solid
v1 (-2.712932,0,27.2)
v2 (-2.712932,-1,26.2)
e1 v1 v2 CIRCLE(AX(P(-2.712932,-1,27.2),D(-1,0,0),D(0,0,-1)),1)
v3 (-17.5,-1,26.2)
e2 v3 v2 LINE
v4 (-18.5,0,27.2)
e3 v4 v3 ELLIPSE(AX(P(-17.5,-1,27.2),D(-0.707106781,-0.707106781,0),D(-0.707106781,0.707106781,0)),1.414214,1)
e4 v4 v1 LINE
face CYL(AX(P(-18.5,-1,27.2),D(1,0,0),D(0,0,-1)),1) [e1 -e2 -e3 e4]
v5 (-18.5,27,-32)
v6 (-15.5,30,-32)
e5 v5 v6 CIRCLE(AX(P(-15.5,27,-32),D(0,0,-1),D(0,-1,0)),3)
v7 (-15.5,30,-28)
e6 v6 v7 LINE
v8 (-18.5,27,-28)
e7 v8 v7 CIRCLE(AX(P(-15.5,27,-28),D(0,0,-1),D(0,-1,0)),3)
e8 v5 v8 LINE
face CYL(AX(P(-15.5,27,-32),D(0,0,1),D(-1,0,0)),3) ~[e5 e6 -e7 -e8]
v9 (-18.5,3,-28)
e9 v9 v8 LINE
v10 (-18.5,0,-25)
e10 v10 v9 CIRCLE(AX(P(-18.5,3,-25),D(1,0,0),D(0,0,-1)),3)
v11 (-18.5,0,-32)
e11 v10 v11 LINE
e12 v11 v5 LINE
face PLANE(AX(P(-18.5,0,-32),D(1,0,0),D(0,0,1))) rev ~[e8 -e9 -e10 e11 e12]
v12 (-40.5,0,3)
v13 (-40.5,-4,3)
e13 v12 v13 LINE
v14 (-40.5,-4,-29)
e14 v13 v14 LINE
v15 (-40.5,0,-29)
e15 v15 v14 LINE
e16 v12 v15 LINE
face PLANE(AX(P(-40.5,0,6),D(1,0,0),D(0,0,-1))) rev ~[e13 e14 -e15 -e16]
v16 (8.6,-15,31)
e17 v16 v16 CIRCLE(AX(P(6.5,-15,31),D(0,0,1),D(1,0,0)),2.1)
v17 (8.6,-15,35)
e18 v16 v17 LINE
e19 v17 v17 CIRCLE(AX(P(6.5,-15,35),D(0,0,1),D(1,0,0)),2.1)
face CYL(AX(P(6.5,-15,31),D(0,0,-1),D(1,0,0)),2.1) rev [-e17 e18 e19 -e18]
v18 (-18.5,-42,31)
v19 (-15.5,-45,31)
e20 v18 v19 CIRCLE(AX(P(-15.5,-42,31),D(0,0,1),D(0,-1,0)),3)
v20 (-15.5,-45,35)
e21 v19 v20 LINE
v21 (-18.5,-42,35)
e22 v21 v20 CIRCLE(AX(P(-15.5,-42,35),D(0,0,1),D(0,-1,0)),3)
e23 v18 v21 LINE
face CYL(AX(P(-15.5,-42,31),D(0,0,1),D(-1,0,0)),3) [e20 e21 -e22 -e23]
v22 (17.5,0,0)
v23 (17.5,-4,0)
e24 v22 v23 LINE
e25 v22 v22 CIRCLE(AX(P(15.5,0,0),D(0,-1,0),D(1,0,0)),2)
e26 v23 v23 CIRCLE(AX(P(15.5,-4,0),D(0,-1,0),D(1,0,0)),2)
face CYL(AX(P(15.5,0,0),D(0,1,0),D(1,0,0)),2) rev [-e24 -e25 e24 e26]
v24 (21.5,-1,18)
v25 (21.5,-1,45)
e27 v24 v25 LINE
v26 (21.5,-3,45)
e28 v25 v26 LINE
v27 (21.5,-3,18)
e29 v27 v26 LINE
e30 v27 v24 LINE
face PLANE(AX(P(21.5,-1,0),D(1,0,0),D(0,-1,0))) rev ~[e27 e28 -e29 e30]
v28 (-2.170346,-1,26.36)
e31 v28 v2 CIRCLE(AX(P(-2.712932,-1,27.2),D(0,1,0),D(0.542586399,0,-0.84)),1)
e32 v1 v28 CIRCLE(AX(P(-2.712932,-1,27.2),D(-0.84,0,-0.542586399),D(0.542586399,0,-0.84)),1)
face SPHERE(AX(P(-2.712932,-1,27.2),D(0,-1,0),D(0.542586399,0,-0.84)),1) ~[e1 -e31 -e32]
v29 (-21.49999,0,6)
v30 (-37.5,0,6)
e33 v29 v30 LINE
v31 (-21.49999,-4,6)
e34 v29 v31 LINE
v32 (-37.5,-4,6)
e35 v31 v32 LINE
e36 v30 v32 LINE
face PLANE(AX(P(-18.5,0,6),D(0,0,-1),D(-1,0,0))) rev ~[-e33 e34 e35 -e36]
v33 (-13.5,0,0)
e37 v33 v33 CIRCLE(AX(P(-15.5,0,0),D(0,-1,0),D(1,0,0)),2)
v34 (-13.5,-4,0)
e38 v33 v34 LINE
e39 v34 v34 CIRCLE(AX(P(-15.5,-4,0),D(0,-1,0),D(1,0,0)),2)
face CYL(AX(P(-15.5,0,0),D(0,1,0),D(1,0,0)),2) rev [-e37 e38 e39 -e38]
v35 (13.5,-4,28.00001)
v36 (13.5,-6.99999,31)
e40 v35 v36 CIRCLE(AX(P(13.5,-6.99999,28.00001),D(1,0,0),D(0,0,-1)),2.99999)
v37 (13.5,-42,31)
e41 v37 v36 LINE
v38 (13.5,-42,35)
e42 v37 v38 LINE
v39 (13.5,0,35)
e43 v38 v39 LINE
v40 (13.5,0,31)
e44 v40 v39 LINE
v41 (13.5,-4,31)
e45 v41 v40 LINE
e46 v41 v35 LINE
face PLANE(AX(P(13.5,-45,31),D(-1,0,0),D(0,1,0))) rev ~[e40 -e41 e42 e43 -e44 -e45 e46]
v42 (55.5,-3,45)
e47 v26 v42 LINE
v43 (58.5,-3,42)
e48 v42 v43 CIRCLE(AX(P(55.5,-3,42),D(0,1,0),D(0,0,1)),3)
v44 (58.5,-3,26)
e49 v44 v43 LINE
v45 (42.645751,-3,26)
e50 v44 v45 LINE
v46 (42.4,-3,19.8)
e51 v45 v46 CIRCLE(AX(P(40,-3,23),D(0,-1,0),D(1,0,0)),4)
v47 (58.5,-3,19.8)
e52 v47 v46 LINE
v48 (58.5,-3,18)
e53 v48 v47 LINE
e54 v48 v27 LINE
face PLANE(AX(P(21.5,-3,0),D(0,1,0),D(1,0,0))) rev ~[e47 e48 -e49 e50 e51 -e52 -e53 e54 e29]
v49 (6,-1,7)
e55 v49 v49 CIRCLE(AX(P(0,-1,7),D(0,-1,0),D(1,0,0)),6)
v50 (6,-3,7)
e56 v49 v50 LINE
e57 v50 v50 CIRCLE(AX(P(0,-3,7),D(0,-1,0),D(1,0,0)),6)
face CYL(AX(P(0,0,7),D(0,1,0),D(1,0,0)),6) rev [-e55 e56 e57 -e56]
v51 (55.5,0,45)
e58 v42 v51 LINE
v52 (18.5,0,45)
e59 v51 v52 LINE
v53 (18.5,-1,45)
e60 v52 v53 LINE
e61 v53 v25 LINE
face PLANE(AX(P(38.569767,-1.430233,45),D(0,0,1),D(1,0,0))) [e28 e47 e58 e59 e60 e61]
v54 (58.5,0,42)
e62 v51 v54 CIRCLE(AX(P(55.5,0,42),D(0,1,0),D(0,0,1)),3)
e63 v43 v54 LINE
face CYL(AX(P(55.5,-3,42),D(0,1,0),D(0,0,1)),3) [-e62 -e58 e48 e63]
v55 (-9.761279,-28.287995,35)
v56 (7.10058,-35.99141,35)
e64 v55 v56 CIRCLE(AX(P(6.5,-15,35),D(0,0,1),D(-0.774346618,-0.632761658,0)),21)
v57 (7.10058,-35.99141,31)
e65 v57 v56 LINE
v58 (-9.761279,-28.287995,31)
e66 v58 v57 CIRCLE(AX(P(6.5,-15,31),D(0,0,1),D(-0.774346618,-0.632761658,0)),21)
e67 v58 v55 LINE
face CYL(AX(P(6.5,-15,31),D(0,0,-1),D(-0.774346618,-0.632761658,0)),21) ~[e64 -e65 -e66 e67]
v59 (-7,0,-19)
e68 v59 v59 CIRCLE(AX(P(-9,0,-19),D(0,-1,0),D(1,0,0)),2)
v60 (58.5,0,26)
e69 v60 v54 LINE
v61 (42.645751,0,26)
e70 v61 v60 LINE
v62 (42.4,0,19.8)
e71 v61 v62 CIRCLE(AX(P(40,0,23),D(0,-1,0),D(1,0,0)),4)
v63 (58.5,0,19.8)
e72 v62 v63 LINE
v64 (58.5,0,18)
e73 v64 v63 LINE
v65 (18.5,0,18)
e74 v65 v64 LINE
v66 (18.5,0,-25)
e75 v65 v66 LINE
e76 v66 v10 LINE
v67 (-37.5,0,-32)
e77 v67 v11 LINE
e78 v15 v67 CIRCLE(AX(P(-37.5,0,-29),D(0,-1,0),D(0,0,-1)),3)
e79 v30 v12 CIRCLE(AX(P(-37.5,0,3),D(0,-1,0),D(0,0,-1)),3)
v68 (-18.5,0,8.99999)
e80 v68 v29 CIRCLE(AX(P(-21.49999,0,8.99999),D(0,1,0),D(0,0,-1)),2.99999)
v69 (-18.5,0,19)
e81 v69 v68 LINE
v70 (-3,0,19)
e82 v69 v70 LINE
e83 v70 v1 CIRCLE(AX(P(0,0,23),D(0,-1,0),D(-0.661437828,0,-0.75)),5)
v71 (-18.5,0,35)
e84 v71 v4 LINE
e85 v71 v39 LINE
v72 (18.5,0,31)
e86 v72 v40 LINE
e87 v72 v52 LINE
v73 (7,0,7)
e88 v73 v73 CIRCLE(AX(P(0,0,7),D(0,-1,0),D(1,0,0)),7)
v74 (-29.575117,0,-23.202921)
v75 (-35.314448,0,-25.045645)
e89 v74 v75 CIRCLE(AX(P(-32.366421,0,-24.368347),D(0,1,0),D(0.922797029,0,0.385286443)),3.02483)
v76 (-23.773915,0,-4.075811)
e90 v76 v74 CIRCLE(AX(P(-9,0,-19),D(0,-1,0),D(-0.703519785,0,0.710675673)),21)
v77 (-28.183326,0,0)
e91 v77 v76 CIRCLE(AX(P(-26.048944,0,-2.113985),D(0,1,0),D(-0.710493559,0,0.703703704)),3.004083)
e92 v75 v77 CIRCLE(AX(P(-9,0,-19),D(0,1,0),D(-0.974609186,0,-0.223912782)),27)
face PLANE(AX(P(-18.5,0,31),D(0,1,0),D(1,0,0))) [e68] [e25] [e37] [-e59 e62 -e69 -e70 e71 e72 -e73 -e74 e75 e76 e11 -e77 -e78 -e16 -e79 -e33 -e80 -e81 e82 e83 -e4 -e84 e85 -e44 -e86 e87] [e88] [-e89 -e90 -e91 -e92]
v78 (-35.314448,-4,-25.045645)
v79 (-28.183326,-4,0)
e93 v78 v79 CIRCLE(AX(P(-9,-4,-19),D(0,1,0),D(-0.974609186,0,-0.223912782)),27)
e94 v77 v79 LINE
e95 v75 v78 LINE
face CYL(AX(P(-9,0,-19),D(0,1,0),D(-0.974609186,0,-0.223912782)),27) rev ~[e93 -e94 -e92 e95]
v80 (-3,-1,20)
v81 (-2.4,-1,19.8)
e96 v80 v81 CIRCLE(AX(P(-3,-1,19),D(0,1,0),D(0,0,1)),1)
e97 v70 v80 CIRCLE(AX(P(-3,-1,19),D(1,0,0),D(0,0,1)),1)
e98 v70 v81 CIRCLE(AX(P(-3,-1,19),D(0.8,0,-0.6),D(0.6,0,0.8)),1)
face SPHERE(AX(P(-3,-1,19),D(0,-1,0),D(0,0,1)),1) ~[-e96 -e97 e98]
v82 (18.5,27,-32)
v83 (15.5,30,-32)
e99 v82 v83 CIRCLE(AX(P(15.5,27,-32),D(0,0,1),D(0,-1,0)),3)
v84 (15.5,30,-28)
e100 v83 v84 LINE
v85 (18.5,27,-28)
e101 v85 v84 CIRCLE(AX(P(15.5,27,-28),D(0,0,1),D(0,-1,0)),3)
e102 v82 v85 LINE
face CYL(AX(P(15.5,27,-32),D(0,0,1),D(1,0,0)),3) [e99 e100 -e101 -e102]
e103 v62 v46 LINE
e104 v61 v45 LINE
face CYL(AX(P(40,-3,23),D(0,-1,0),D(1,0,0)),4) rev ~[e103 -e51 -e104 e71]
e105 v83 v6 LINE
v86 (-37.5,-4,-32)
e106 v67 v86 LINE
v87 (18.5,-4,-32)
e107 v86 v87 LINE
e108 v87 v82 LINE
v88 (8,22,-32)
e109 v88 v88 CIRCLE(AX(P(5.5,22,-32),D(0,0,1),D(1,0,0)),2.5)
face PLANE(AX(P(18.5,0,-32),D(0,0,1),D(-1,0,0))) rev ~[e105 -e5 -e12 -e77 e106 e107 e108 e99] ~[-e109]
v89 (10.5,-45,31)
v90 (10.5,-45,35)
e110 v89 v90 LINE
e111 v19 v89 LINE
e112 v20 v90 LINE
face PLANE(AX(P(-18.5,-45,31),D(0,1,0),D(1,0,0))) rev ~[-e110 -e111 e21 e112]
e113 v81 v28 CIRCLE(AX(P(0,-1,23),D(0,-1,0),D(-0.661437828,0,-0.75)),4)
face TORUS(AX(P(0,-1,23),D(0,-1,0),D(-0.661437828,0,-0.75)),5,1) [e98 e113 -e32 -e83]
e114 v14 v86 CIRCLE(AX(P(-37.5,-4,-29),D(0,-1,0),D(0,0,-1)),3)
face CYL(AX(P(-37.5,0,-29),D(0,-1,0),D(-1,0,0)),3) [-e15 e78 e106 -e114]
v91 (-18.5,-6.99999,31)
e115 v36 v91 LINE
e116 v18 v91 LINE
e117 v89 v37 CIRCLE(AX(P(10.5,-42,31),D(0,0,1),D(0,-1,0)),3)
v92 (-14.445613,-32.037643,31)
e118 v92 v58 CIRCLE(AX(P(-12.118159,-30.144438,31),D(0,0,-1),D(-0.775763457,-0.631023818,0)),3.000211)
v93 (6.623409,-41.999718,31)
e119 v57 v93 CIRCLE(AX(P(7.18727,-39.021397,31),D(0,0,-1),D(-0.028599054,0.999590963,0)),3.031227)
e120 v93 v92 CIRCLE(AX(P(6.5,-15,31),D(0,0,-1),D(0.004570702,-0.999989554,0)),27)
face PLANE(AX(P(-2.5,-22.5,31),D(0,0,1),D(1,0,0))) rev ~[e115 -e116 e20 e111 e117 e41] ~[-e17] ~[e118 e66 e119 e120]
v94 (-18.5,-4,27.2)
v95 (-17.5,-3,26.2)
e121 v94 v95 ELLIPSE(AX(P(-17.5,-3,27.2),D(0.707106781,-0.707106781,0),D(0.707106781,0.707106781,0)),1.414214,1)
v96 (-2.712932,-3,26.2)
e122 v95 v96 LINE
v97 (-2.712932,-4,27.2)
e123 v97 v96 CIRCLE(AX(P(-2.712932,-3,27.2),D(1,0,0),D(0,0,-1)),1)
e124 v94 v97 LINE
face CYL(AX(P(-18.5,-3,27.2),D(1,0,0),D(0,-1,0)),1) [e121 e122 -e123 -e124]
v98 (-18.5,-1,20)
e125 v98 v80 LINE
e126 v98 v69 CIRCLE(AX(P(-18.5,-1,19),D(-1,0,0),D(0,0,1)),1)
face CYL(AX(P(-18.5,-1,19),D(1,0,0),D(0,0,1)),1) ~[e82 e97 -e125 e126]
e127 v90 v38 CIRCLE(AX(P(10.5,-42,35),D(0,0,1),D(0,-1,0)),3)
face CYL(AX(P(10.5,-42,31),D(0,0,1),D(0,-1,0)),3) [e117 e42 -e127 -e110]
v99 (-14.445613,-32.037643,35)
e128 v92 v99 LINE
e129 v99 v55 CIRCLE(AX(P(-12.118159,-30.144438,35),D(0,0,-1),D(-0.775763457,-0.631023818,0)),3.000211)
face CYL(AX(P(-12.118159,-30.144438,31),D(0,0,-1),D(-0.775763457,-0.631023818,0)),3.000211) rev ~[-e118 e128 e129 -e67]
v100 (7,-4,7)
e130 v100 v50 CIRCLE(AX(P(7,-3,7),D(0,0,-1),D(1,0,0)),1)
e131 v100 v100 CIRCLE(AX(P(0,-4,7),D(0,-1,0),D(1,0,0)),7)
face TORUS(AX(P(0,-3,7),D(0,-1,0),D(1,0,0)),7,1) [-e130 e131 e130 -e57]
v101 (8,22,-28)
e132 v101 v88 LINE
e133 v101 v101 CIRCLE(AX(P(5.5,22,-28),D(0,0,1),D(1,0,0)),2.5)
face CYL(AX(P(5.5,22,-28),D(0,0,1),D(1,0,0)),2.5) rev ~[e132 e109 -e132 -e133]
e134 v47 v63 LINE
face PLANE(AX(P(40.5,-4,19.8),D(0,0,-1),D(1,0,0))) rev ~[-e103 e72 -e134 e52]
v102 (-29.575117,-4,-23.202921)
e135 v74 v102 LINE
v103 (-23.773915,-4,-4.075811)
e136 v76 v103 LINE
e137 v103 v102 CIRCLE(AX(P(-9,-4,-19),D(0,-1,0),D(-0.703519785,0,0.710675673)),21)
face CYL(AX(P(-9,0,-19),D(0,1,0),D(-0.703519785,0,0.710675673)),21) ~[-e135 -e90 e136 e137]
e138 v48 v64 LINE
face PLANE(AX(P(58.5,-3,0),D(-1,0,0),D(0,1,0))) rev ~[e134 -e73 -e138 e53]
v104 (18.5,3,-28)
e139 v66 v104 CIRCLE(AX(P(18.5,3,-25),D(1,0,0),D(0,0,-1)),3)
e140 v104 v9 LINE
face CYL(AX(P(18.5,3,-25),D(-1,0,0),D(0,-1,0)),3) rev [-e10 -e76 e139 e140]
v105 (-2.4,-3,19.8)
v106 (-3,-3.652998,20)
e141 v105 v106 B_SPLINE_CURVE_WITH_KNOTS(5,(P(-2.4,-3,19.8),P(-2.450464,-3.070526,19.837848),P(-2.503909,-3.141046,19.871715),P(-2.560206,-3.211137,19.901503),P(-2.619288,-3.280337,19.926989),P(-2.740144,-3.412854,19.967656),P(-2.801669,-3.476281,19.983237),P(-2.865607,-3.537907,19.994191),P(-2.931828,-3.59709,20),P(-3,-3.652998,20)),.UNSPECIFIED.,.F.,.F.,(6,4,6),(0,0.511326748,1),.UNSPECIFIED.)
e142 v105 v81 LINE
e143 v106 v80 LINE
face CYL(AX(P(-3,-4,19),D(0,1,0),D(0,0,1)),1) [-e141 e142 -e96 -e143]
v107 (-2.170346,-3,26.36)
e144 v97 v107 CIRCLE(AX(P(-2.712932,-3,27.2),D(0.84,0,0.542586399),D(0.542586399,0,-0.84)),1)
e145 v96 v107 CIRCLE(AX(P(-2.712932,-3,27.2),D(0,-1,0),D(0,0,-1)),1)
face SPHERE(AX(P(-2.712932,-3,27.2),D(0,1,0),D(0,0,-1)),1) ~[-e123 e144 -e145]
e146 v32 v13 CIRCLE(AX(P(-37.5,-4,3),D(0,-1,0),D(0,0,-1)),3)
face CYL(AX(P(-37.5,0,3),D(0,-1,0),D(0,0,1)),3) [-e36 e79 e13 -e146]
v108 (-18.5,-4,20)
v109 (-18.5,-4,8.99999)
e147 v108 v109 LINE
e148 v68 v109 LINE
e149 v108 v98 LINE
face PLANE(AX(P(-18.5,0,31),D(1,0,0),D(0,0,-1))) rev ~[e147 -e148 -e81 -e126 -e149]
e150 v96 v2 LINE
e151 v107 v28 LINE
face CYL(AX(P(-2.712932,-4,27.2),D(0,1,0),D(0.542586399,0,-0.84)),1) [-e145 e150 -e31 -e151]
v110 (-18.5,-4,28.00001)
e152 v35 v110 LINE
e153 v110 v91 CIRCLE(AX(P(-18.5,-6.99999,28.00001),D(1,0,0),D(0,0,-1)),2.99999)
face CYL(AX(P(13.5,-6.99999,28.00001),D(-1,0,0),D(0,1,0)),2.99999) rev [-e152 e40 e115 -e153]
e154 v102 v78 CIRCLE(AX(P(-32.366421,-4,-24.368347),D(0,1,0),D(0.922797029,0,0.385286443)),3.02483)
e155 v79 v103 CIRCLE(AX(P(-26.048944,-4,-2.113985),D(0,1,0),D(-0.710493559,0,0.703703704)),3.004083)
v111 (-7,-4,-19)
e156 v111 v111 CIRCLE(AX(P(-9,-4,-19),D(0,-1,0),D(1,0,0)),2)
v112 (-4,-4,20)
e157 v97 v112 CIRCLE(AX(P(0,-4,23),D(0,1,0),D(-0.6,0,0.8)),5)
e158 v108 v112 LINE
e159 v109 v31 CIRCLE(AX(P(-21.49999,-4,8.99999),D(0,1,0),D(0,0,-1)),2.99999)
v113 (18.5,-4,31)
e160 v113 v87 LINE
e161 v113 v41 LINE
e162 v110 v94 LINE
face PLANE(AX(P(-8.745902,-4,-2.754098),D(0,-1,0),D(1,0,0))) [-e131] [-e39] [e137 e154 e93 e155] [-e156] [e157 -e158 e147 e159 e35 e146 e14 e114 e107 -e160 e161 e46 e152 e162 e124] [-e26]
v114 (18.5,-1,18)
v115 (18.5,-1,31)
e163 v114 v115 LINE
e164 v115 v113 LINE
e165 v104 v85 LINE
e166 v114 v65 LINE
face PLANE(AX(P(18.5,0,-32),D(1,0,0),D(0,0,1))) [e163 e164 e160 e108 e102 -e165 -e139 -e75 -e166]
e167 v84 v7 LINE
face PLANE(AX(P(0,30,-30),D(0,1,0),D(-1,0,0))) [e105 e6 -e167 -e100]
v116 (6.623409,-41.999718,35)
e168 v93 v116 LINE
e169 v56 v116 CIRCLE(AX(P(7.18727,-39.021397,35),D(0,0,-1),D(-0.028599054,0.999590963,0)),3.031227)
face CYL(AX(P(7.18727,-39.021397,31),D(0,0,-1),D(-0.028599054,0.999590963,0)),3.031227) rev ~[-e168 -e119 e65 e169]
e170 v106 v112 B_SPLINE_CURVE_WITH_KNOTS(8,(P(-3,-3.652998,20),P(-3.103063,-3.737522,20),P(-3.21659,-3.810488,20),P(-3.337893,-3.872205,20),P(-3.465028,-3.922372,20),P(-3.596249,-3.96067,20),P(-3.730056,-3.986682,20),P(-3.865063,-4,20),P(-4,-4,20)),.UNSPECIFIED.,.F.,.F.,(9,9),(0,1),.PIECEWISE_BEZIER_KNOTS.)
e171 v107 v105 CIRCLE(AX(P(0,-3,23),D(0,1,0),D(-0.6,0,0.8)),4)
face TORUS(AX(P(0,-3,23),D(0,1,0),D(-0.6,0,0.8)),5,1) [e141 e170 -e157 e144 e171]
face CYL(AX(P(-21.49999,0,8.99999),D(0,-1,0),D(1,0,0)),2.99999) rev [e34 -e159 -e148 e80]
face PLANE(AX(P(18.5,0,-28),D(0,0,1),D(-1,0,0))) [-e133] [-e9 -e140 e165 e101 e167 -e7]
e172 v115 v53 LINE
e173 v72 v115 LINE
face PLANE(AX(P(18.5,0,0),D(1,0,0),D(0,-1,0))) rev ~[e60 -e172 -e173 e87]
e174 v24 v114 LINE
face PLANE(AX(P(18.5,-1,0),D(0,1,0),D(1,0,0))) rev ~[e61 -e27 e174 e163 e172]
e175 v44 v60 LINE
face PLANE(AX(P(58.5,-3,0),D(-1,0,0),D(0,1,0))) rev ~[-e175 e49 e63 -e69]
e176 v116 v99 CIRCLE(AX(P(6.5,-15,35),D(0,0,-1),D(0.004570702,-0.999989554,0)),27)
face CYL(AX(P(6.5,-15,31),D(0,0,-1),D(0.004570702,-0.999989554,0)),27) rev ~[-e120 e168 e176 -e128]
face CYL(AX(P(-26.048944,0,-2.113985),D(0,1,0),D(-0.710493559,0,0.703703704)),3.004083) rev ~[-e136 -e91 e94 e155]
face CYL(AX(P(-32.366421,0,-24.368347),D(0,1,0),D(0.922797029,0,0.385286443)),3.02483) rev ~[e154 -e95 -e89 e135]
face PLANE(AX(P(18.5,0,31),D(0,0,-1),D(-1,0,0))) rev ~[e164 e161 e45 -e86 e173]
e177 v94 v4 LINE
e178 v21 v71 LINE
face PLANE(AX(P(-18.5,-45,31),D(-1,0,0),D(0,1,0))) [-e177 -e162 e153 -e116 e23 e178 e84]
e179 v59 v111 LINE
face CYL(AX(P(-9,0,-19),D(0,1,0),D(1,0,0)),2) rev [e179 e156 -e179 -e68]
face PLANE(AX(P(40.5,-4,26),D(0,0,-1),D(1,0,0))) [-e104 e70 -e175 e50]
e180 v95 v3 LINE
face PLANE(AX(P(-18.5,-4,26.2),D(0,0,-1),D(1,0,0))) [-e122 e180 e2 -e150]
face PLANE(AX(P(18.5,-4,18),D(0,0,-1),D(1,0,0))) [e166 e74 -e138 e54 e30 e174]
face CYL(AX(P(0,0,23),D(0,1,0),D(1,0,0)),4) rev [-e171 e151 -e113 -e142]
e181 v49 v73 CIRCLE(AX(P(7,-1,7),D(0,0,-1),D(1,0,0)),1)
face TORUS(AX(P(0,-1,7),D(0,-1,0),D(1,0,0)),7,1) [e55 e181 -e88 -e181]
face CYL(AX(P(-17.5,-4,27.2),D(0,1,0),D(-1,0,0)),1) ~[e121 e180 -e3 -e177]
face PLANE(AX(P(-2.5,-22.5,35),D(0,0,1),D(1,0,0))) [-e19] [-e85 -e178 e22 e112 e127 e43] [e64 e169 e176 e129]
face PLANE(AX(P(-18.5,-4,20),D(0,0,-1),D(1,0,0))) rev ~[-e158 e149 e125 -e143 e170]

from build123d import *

# Parameters (mm, degrees)
F0_R      = 2
F0_R_2    = 6
F0_R_3    = 4
F1_DEPTH  = 4
F3_DEPTH  = 45
F4_R      = 4
F5_DEPTH  = 3.001
F6_W      = 18
F6_H      = 6.2
F6_W_2    = 40
F6_H_2    = 18
F7_DEPTH  = 4.001
F8_W      = 37
F8_H      = 4
F9_DEPTH  = 30
F10_R     = 2.5
F11_DEPTH = 4.001
F12_W     = 32
F12_H     = 45
F12_R     = 2.1
F13_DEPTH = 4
F14_R     = 1
F15_R     = 3
F16_R     = 2.99999


# Not quite as in the source:
# - a fillet or chamfer is up to 0.001 mm smaller than in the source, because OpenCascade refuses the exact size


with BuildPart() as f1:
    # F0 (on Front) → F1 (new body)
    with BuildSketch(Plane.XZ):
        Polygon((-40.5, -32), (-18.5, -32), (18.5, -32), (18.5, 0), (18.5, 31), (-18.5, 31), (-18.5, 6), (-40.5, 6), align=None)
        with BuildLine():
            ThreePointArc((-28.1833260933, 0), (-24.0098257239, 0.092032915), (-23.7739154785, -4.0758108617))
            ThreePointArc((-23.7739154785, -4.0758108617), (-29.0960224362, -12.9049296767), (-29.5751173341, -23.2029212089))
            ThreePointArc((-29.5751173341, -23.2029212089), (-31.4417329452, -27.2483725045), (-35.3144480282, -25.0456451244))
            ThreePointArc((-35.3144480282, -25.0456451244), (-34.9679215076, -11.6062828988), (-28.1833260933, 0))
        make_face(mode=Mode.SUBTRACT)
        with Locations((-9, -19)):
            Circle(F0_R, mode=Mode.SUBTRACT)
        with Locations((-15.5, 0)):
            Circle(F0_R, mode=Mode.SUBTRACT)
        with Locations((0, 7)):
            Circle(F0_R_2, mode=Mode.SUBTRACT)
        with Locations((15.5, 0)):
            Circle(F0_R, mode=Mode.SUBTRACT)
        with Locations((0, 23)):
            Circle(F0_R_3, mode=Mode.SUBTRACT)
    extrude(amount=F1_DEPTH)

    # F2 (on Top) → F3 (join)
    with BuildSketch(Plane.XY):
        Polygon((18.5, 0), (18.5, -1), (21.5, -1), (21.5, -3), (58.5, -3), (58.5, 0), align=None)
    extrude(amount=F3_DEPTH)

    # F4 (on face) → F5 (cut, through all)
    with BuildSketch(Plane.XZ.offset(3)):
        with Locations((40, 23)):
            Circle(F4_R)
    extrude(amount=-F5_DEPTH, mode=Mode.SUBTRACT)

    # F6 (on face) → F7 (cut, through all)
    with BuildSketch(Plane.XZ.offset(4)):
        with Locations((-9.5, 23.1)):
            Rectangle(F6_W, F6_H)
        with Locations((49.5, 22.9)):
            Rectangle(F6_W, F6_H)
        with Locations((38.5, 9)):
            Rectangle(F6_W_2, F6_H_2)
    extrude(amount=-F7_DEPTH, mode=Mode.SUBTRACT)

    # F8 (on face) → F9 (join)
    with BuildSketch(Plane(origin=(0, 0, 0), x_dir=(-1, 0, 0), z_dir=(0, 1, 0))):
        with Locations((0, -30)):
            Rectangle(F8_W, F8_H)
    extrude(amount=F9_DEPTH)

    # F10 (on face) → F11 (cut, through all)
    with BuildSketch(Plane.XY.offset(-28)):
        with Locations((5.5, 22)):
            Circle(F10_R)
    extrude(amount=-F11_DEPTH, mode=Mode.SUBTRACT)

    # F12 (on face) → F13 (join)
    with BuildSketch(Plane.XY.offset(31)):
        with Locations((-2.5, -22.5)):
            Rectangle(F12_W, F12_H)
        with BuildLine():
            ThreePointArc((6.6234089411, -41.9997179658), (-5.0413076784, -39.4089782063), (-14.4456133354, -32.0376430883))
            ThreePointArc((-14.4456133354, -32.0376430883), (-13.9930410249, -27.8021990866), (-9.7612789693, -28.2879948179))
            ThreePointArc((-9.7612789693, -28.2879948179), (-2.2263981239, -34.1010464578), (7.1005801395, -35.9914102312))
            ThreePointArc((7.1005801395, -35.9914102312), (10.2089825884, -39.2613770976), (6.6234089411, -41.9997179658))
        make_face(mode=Mode.SUBTRACT)
        with Locations((6.5, -15)):
            Circle(F12_R, mode=Mode.SUBTRACT)
    extrude(amount=F13_DEPTH)

    # F14
    f14_edges = [f1.edges().sort_by_distance(p)[0] for p in [
        (6, -2, 7),
        (-6, 0, 7),
        (-6, -4, 7),
        (3.996861, -4, 22.841575),
        (-2.4, -2, 26.2),
        (3.996861, 0, 22.841575),
        (-2.645751, -2, 20),
        (-10.45, -4, 26.2),
        (-18.5, -2, 26.2),
        (-10.45, 0, 26.2),
        (-10.572876, 0, 20),
    ]]
    fillet(f14_edges, radius=F14_R)

    # F15
    f15_edges = [f1.edges().sort_by_distance(p)[0] for p in [
        (0, 0, -28),
        (-40.5, -2, 6),
        (-40.5, -2, -32),
        (18.5, 30, -30),
        (-18.5, 30, -30),
        (58.5, -1.5, 45),
        (-18.5, -45, 33),
        (13.5, -45, 33),
    ]]
    fillet(f15_edges, radius=F15_R)

    # F16 (radius 3 in the source; OpenCascade refuses exactly that, so slightly less here)
    f16_edges = [f1.edges().sort_by_distance(p)[0] for p in [
        (-2.5, -4, 31),
        (-18.5, -2, 6),
    ]]
    fillet(f16_edges, radius=F16_R)


solid = f1.part
